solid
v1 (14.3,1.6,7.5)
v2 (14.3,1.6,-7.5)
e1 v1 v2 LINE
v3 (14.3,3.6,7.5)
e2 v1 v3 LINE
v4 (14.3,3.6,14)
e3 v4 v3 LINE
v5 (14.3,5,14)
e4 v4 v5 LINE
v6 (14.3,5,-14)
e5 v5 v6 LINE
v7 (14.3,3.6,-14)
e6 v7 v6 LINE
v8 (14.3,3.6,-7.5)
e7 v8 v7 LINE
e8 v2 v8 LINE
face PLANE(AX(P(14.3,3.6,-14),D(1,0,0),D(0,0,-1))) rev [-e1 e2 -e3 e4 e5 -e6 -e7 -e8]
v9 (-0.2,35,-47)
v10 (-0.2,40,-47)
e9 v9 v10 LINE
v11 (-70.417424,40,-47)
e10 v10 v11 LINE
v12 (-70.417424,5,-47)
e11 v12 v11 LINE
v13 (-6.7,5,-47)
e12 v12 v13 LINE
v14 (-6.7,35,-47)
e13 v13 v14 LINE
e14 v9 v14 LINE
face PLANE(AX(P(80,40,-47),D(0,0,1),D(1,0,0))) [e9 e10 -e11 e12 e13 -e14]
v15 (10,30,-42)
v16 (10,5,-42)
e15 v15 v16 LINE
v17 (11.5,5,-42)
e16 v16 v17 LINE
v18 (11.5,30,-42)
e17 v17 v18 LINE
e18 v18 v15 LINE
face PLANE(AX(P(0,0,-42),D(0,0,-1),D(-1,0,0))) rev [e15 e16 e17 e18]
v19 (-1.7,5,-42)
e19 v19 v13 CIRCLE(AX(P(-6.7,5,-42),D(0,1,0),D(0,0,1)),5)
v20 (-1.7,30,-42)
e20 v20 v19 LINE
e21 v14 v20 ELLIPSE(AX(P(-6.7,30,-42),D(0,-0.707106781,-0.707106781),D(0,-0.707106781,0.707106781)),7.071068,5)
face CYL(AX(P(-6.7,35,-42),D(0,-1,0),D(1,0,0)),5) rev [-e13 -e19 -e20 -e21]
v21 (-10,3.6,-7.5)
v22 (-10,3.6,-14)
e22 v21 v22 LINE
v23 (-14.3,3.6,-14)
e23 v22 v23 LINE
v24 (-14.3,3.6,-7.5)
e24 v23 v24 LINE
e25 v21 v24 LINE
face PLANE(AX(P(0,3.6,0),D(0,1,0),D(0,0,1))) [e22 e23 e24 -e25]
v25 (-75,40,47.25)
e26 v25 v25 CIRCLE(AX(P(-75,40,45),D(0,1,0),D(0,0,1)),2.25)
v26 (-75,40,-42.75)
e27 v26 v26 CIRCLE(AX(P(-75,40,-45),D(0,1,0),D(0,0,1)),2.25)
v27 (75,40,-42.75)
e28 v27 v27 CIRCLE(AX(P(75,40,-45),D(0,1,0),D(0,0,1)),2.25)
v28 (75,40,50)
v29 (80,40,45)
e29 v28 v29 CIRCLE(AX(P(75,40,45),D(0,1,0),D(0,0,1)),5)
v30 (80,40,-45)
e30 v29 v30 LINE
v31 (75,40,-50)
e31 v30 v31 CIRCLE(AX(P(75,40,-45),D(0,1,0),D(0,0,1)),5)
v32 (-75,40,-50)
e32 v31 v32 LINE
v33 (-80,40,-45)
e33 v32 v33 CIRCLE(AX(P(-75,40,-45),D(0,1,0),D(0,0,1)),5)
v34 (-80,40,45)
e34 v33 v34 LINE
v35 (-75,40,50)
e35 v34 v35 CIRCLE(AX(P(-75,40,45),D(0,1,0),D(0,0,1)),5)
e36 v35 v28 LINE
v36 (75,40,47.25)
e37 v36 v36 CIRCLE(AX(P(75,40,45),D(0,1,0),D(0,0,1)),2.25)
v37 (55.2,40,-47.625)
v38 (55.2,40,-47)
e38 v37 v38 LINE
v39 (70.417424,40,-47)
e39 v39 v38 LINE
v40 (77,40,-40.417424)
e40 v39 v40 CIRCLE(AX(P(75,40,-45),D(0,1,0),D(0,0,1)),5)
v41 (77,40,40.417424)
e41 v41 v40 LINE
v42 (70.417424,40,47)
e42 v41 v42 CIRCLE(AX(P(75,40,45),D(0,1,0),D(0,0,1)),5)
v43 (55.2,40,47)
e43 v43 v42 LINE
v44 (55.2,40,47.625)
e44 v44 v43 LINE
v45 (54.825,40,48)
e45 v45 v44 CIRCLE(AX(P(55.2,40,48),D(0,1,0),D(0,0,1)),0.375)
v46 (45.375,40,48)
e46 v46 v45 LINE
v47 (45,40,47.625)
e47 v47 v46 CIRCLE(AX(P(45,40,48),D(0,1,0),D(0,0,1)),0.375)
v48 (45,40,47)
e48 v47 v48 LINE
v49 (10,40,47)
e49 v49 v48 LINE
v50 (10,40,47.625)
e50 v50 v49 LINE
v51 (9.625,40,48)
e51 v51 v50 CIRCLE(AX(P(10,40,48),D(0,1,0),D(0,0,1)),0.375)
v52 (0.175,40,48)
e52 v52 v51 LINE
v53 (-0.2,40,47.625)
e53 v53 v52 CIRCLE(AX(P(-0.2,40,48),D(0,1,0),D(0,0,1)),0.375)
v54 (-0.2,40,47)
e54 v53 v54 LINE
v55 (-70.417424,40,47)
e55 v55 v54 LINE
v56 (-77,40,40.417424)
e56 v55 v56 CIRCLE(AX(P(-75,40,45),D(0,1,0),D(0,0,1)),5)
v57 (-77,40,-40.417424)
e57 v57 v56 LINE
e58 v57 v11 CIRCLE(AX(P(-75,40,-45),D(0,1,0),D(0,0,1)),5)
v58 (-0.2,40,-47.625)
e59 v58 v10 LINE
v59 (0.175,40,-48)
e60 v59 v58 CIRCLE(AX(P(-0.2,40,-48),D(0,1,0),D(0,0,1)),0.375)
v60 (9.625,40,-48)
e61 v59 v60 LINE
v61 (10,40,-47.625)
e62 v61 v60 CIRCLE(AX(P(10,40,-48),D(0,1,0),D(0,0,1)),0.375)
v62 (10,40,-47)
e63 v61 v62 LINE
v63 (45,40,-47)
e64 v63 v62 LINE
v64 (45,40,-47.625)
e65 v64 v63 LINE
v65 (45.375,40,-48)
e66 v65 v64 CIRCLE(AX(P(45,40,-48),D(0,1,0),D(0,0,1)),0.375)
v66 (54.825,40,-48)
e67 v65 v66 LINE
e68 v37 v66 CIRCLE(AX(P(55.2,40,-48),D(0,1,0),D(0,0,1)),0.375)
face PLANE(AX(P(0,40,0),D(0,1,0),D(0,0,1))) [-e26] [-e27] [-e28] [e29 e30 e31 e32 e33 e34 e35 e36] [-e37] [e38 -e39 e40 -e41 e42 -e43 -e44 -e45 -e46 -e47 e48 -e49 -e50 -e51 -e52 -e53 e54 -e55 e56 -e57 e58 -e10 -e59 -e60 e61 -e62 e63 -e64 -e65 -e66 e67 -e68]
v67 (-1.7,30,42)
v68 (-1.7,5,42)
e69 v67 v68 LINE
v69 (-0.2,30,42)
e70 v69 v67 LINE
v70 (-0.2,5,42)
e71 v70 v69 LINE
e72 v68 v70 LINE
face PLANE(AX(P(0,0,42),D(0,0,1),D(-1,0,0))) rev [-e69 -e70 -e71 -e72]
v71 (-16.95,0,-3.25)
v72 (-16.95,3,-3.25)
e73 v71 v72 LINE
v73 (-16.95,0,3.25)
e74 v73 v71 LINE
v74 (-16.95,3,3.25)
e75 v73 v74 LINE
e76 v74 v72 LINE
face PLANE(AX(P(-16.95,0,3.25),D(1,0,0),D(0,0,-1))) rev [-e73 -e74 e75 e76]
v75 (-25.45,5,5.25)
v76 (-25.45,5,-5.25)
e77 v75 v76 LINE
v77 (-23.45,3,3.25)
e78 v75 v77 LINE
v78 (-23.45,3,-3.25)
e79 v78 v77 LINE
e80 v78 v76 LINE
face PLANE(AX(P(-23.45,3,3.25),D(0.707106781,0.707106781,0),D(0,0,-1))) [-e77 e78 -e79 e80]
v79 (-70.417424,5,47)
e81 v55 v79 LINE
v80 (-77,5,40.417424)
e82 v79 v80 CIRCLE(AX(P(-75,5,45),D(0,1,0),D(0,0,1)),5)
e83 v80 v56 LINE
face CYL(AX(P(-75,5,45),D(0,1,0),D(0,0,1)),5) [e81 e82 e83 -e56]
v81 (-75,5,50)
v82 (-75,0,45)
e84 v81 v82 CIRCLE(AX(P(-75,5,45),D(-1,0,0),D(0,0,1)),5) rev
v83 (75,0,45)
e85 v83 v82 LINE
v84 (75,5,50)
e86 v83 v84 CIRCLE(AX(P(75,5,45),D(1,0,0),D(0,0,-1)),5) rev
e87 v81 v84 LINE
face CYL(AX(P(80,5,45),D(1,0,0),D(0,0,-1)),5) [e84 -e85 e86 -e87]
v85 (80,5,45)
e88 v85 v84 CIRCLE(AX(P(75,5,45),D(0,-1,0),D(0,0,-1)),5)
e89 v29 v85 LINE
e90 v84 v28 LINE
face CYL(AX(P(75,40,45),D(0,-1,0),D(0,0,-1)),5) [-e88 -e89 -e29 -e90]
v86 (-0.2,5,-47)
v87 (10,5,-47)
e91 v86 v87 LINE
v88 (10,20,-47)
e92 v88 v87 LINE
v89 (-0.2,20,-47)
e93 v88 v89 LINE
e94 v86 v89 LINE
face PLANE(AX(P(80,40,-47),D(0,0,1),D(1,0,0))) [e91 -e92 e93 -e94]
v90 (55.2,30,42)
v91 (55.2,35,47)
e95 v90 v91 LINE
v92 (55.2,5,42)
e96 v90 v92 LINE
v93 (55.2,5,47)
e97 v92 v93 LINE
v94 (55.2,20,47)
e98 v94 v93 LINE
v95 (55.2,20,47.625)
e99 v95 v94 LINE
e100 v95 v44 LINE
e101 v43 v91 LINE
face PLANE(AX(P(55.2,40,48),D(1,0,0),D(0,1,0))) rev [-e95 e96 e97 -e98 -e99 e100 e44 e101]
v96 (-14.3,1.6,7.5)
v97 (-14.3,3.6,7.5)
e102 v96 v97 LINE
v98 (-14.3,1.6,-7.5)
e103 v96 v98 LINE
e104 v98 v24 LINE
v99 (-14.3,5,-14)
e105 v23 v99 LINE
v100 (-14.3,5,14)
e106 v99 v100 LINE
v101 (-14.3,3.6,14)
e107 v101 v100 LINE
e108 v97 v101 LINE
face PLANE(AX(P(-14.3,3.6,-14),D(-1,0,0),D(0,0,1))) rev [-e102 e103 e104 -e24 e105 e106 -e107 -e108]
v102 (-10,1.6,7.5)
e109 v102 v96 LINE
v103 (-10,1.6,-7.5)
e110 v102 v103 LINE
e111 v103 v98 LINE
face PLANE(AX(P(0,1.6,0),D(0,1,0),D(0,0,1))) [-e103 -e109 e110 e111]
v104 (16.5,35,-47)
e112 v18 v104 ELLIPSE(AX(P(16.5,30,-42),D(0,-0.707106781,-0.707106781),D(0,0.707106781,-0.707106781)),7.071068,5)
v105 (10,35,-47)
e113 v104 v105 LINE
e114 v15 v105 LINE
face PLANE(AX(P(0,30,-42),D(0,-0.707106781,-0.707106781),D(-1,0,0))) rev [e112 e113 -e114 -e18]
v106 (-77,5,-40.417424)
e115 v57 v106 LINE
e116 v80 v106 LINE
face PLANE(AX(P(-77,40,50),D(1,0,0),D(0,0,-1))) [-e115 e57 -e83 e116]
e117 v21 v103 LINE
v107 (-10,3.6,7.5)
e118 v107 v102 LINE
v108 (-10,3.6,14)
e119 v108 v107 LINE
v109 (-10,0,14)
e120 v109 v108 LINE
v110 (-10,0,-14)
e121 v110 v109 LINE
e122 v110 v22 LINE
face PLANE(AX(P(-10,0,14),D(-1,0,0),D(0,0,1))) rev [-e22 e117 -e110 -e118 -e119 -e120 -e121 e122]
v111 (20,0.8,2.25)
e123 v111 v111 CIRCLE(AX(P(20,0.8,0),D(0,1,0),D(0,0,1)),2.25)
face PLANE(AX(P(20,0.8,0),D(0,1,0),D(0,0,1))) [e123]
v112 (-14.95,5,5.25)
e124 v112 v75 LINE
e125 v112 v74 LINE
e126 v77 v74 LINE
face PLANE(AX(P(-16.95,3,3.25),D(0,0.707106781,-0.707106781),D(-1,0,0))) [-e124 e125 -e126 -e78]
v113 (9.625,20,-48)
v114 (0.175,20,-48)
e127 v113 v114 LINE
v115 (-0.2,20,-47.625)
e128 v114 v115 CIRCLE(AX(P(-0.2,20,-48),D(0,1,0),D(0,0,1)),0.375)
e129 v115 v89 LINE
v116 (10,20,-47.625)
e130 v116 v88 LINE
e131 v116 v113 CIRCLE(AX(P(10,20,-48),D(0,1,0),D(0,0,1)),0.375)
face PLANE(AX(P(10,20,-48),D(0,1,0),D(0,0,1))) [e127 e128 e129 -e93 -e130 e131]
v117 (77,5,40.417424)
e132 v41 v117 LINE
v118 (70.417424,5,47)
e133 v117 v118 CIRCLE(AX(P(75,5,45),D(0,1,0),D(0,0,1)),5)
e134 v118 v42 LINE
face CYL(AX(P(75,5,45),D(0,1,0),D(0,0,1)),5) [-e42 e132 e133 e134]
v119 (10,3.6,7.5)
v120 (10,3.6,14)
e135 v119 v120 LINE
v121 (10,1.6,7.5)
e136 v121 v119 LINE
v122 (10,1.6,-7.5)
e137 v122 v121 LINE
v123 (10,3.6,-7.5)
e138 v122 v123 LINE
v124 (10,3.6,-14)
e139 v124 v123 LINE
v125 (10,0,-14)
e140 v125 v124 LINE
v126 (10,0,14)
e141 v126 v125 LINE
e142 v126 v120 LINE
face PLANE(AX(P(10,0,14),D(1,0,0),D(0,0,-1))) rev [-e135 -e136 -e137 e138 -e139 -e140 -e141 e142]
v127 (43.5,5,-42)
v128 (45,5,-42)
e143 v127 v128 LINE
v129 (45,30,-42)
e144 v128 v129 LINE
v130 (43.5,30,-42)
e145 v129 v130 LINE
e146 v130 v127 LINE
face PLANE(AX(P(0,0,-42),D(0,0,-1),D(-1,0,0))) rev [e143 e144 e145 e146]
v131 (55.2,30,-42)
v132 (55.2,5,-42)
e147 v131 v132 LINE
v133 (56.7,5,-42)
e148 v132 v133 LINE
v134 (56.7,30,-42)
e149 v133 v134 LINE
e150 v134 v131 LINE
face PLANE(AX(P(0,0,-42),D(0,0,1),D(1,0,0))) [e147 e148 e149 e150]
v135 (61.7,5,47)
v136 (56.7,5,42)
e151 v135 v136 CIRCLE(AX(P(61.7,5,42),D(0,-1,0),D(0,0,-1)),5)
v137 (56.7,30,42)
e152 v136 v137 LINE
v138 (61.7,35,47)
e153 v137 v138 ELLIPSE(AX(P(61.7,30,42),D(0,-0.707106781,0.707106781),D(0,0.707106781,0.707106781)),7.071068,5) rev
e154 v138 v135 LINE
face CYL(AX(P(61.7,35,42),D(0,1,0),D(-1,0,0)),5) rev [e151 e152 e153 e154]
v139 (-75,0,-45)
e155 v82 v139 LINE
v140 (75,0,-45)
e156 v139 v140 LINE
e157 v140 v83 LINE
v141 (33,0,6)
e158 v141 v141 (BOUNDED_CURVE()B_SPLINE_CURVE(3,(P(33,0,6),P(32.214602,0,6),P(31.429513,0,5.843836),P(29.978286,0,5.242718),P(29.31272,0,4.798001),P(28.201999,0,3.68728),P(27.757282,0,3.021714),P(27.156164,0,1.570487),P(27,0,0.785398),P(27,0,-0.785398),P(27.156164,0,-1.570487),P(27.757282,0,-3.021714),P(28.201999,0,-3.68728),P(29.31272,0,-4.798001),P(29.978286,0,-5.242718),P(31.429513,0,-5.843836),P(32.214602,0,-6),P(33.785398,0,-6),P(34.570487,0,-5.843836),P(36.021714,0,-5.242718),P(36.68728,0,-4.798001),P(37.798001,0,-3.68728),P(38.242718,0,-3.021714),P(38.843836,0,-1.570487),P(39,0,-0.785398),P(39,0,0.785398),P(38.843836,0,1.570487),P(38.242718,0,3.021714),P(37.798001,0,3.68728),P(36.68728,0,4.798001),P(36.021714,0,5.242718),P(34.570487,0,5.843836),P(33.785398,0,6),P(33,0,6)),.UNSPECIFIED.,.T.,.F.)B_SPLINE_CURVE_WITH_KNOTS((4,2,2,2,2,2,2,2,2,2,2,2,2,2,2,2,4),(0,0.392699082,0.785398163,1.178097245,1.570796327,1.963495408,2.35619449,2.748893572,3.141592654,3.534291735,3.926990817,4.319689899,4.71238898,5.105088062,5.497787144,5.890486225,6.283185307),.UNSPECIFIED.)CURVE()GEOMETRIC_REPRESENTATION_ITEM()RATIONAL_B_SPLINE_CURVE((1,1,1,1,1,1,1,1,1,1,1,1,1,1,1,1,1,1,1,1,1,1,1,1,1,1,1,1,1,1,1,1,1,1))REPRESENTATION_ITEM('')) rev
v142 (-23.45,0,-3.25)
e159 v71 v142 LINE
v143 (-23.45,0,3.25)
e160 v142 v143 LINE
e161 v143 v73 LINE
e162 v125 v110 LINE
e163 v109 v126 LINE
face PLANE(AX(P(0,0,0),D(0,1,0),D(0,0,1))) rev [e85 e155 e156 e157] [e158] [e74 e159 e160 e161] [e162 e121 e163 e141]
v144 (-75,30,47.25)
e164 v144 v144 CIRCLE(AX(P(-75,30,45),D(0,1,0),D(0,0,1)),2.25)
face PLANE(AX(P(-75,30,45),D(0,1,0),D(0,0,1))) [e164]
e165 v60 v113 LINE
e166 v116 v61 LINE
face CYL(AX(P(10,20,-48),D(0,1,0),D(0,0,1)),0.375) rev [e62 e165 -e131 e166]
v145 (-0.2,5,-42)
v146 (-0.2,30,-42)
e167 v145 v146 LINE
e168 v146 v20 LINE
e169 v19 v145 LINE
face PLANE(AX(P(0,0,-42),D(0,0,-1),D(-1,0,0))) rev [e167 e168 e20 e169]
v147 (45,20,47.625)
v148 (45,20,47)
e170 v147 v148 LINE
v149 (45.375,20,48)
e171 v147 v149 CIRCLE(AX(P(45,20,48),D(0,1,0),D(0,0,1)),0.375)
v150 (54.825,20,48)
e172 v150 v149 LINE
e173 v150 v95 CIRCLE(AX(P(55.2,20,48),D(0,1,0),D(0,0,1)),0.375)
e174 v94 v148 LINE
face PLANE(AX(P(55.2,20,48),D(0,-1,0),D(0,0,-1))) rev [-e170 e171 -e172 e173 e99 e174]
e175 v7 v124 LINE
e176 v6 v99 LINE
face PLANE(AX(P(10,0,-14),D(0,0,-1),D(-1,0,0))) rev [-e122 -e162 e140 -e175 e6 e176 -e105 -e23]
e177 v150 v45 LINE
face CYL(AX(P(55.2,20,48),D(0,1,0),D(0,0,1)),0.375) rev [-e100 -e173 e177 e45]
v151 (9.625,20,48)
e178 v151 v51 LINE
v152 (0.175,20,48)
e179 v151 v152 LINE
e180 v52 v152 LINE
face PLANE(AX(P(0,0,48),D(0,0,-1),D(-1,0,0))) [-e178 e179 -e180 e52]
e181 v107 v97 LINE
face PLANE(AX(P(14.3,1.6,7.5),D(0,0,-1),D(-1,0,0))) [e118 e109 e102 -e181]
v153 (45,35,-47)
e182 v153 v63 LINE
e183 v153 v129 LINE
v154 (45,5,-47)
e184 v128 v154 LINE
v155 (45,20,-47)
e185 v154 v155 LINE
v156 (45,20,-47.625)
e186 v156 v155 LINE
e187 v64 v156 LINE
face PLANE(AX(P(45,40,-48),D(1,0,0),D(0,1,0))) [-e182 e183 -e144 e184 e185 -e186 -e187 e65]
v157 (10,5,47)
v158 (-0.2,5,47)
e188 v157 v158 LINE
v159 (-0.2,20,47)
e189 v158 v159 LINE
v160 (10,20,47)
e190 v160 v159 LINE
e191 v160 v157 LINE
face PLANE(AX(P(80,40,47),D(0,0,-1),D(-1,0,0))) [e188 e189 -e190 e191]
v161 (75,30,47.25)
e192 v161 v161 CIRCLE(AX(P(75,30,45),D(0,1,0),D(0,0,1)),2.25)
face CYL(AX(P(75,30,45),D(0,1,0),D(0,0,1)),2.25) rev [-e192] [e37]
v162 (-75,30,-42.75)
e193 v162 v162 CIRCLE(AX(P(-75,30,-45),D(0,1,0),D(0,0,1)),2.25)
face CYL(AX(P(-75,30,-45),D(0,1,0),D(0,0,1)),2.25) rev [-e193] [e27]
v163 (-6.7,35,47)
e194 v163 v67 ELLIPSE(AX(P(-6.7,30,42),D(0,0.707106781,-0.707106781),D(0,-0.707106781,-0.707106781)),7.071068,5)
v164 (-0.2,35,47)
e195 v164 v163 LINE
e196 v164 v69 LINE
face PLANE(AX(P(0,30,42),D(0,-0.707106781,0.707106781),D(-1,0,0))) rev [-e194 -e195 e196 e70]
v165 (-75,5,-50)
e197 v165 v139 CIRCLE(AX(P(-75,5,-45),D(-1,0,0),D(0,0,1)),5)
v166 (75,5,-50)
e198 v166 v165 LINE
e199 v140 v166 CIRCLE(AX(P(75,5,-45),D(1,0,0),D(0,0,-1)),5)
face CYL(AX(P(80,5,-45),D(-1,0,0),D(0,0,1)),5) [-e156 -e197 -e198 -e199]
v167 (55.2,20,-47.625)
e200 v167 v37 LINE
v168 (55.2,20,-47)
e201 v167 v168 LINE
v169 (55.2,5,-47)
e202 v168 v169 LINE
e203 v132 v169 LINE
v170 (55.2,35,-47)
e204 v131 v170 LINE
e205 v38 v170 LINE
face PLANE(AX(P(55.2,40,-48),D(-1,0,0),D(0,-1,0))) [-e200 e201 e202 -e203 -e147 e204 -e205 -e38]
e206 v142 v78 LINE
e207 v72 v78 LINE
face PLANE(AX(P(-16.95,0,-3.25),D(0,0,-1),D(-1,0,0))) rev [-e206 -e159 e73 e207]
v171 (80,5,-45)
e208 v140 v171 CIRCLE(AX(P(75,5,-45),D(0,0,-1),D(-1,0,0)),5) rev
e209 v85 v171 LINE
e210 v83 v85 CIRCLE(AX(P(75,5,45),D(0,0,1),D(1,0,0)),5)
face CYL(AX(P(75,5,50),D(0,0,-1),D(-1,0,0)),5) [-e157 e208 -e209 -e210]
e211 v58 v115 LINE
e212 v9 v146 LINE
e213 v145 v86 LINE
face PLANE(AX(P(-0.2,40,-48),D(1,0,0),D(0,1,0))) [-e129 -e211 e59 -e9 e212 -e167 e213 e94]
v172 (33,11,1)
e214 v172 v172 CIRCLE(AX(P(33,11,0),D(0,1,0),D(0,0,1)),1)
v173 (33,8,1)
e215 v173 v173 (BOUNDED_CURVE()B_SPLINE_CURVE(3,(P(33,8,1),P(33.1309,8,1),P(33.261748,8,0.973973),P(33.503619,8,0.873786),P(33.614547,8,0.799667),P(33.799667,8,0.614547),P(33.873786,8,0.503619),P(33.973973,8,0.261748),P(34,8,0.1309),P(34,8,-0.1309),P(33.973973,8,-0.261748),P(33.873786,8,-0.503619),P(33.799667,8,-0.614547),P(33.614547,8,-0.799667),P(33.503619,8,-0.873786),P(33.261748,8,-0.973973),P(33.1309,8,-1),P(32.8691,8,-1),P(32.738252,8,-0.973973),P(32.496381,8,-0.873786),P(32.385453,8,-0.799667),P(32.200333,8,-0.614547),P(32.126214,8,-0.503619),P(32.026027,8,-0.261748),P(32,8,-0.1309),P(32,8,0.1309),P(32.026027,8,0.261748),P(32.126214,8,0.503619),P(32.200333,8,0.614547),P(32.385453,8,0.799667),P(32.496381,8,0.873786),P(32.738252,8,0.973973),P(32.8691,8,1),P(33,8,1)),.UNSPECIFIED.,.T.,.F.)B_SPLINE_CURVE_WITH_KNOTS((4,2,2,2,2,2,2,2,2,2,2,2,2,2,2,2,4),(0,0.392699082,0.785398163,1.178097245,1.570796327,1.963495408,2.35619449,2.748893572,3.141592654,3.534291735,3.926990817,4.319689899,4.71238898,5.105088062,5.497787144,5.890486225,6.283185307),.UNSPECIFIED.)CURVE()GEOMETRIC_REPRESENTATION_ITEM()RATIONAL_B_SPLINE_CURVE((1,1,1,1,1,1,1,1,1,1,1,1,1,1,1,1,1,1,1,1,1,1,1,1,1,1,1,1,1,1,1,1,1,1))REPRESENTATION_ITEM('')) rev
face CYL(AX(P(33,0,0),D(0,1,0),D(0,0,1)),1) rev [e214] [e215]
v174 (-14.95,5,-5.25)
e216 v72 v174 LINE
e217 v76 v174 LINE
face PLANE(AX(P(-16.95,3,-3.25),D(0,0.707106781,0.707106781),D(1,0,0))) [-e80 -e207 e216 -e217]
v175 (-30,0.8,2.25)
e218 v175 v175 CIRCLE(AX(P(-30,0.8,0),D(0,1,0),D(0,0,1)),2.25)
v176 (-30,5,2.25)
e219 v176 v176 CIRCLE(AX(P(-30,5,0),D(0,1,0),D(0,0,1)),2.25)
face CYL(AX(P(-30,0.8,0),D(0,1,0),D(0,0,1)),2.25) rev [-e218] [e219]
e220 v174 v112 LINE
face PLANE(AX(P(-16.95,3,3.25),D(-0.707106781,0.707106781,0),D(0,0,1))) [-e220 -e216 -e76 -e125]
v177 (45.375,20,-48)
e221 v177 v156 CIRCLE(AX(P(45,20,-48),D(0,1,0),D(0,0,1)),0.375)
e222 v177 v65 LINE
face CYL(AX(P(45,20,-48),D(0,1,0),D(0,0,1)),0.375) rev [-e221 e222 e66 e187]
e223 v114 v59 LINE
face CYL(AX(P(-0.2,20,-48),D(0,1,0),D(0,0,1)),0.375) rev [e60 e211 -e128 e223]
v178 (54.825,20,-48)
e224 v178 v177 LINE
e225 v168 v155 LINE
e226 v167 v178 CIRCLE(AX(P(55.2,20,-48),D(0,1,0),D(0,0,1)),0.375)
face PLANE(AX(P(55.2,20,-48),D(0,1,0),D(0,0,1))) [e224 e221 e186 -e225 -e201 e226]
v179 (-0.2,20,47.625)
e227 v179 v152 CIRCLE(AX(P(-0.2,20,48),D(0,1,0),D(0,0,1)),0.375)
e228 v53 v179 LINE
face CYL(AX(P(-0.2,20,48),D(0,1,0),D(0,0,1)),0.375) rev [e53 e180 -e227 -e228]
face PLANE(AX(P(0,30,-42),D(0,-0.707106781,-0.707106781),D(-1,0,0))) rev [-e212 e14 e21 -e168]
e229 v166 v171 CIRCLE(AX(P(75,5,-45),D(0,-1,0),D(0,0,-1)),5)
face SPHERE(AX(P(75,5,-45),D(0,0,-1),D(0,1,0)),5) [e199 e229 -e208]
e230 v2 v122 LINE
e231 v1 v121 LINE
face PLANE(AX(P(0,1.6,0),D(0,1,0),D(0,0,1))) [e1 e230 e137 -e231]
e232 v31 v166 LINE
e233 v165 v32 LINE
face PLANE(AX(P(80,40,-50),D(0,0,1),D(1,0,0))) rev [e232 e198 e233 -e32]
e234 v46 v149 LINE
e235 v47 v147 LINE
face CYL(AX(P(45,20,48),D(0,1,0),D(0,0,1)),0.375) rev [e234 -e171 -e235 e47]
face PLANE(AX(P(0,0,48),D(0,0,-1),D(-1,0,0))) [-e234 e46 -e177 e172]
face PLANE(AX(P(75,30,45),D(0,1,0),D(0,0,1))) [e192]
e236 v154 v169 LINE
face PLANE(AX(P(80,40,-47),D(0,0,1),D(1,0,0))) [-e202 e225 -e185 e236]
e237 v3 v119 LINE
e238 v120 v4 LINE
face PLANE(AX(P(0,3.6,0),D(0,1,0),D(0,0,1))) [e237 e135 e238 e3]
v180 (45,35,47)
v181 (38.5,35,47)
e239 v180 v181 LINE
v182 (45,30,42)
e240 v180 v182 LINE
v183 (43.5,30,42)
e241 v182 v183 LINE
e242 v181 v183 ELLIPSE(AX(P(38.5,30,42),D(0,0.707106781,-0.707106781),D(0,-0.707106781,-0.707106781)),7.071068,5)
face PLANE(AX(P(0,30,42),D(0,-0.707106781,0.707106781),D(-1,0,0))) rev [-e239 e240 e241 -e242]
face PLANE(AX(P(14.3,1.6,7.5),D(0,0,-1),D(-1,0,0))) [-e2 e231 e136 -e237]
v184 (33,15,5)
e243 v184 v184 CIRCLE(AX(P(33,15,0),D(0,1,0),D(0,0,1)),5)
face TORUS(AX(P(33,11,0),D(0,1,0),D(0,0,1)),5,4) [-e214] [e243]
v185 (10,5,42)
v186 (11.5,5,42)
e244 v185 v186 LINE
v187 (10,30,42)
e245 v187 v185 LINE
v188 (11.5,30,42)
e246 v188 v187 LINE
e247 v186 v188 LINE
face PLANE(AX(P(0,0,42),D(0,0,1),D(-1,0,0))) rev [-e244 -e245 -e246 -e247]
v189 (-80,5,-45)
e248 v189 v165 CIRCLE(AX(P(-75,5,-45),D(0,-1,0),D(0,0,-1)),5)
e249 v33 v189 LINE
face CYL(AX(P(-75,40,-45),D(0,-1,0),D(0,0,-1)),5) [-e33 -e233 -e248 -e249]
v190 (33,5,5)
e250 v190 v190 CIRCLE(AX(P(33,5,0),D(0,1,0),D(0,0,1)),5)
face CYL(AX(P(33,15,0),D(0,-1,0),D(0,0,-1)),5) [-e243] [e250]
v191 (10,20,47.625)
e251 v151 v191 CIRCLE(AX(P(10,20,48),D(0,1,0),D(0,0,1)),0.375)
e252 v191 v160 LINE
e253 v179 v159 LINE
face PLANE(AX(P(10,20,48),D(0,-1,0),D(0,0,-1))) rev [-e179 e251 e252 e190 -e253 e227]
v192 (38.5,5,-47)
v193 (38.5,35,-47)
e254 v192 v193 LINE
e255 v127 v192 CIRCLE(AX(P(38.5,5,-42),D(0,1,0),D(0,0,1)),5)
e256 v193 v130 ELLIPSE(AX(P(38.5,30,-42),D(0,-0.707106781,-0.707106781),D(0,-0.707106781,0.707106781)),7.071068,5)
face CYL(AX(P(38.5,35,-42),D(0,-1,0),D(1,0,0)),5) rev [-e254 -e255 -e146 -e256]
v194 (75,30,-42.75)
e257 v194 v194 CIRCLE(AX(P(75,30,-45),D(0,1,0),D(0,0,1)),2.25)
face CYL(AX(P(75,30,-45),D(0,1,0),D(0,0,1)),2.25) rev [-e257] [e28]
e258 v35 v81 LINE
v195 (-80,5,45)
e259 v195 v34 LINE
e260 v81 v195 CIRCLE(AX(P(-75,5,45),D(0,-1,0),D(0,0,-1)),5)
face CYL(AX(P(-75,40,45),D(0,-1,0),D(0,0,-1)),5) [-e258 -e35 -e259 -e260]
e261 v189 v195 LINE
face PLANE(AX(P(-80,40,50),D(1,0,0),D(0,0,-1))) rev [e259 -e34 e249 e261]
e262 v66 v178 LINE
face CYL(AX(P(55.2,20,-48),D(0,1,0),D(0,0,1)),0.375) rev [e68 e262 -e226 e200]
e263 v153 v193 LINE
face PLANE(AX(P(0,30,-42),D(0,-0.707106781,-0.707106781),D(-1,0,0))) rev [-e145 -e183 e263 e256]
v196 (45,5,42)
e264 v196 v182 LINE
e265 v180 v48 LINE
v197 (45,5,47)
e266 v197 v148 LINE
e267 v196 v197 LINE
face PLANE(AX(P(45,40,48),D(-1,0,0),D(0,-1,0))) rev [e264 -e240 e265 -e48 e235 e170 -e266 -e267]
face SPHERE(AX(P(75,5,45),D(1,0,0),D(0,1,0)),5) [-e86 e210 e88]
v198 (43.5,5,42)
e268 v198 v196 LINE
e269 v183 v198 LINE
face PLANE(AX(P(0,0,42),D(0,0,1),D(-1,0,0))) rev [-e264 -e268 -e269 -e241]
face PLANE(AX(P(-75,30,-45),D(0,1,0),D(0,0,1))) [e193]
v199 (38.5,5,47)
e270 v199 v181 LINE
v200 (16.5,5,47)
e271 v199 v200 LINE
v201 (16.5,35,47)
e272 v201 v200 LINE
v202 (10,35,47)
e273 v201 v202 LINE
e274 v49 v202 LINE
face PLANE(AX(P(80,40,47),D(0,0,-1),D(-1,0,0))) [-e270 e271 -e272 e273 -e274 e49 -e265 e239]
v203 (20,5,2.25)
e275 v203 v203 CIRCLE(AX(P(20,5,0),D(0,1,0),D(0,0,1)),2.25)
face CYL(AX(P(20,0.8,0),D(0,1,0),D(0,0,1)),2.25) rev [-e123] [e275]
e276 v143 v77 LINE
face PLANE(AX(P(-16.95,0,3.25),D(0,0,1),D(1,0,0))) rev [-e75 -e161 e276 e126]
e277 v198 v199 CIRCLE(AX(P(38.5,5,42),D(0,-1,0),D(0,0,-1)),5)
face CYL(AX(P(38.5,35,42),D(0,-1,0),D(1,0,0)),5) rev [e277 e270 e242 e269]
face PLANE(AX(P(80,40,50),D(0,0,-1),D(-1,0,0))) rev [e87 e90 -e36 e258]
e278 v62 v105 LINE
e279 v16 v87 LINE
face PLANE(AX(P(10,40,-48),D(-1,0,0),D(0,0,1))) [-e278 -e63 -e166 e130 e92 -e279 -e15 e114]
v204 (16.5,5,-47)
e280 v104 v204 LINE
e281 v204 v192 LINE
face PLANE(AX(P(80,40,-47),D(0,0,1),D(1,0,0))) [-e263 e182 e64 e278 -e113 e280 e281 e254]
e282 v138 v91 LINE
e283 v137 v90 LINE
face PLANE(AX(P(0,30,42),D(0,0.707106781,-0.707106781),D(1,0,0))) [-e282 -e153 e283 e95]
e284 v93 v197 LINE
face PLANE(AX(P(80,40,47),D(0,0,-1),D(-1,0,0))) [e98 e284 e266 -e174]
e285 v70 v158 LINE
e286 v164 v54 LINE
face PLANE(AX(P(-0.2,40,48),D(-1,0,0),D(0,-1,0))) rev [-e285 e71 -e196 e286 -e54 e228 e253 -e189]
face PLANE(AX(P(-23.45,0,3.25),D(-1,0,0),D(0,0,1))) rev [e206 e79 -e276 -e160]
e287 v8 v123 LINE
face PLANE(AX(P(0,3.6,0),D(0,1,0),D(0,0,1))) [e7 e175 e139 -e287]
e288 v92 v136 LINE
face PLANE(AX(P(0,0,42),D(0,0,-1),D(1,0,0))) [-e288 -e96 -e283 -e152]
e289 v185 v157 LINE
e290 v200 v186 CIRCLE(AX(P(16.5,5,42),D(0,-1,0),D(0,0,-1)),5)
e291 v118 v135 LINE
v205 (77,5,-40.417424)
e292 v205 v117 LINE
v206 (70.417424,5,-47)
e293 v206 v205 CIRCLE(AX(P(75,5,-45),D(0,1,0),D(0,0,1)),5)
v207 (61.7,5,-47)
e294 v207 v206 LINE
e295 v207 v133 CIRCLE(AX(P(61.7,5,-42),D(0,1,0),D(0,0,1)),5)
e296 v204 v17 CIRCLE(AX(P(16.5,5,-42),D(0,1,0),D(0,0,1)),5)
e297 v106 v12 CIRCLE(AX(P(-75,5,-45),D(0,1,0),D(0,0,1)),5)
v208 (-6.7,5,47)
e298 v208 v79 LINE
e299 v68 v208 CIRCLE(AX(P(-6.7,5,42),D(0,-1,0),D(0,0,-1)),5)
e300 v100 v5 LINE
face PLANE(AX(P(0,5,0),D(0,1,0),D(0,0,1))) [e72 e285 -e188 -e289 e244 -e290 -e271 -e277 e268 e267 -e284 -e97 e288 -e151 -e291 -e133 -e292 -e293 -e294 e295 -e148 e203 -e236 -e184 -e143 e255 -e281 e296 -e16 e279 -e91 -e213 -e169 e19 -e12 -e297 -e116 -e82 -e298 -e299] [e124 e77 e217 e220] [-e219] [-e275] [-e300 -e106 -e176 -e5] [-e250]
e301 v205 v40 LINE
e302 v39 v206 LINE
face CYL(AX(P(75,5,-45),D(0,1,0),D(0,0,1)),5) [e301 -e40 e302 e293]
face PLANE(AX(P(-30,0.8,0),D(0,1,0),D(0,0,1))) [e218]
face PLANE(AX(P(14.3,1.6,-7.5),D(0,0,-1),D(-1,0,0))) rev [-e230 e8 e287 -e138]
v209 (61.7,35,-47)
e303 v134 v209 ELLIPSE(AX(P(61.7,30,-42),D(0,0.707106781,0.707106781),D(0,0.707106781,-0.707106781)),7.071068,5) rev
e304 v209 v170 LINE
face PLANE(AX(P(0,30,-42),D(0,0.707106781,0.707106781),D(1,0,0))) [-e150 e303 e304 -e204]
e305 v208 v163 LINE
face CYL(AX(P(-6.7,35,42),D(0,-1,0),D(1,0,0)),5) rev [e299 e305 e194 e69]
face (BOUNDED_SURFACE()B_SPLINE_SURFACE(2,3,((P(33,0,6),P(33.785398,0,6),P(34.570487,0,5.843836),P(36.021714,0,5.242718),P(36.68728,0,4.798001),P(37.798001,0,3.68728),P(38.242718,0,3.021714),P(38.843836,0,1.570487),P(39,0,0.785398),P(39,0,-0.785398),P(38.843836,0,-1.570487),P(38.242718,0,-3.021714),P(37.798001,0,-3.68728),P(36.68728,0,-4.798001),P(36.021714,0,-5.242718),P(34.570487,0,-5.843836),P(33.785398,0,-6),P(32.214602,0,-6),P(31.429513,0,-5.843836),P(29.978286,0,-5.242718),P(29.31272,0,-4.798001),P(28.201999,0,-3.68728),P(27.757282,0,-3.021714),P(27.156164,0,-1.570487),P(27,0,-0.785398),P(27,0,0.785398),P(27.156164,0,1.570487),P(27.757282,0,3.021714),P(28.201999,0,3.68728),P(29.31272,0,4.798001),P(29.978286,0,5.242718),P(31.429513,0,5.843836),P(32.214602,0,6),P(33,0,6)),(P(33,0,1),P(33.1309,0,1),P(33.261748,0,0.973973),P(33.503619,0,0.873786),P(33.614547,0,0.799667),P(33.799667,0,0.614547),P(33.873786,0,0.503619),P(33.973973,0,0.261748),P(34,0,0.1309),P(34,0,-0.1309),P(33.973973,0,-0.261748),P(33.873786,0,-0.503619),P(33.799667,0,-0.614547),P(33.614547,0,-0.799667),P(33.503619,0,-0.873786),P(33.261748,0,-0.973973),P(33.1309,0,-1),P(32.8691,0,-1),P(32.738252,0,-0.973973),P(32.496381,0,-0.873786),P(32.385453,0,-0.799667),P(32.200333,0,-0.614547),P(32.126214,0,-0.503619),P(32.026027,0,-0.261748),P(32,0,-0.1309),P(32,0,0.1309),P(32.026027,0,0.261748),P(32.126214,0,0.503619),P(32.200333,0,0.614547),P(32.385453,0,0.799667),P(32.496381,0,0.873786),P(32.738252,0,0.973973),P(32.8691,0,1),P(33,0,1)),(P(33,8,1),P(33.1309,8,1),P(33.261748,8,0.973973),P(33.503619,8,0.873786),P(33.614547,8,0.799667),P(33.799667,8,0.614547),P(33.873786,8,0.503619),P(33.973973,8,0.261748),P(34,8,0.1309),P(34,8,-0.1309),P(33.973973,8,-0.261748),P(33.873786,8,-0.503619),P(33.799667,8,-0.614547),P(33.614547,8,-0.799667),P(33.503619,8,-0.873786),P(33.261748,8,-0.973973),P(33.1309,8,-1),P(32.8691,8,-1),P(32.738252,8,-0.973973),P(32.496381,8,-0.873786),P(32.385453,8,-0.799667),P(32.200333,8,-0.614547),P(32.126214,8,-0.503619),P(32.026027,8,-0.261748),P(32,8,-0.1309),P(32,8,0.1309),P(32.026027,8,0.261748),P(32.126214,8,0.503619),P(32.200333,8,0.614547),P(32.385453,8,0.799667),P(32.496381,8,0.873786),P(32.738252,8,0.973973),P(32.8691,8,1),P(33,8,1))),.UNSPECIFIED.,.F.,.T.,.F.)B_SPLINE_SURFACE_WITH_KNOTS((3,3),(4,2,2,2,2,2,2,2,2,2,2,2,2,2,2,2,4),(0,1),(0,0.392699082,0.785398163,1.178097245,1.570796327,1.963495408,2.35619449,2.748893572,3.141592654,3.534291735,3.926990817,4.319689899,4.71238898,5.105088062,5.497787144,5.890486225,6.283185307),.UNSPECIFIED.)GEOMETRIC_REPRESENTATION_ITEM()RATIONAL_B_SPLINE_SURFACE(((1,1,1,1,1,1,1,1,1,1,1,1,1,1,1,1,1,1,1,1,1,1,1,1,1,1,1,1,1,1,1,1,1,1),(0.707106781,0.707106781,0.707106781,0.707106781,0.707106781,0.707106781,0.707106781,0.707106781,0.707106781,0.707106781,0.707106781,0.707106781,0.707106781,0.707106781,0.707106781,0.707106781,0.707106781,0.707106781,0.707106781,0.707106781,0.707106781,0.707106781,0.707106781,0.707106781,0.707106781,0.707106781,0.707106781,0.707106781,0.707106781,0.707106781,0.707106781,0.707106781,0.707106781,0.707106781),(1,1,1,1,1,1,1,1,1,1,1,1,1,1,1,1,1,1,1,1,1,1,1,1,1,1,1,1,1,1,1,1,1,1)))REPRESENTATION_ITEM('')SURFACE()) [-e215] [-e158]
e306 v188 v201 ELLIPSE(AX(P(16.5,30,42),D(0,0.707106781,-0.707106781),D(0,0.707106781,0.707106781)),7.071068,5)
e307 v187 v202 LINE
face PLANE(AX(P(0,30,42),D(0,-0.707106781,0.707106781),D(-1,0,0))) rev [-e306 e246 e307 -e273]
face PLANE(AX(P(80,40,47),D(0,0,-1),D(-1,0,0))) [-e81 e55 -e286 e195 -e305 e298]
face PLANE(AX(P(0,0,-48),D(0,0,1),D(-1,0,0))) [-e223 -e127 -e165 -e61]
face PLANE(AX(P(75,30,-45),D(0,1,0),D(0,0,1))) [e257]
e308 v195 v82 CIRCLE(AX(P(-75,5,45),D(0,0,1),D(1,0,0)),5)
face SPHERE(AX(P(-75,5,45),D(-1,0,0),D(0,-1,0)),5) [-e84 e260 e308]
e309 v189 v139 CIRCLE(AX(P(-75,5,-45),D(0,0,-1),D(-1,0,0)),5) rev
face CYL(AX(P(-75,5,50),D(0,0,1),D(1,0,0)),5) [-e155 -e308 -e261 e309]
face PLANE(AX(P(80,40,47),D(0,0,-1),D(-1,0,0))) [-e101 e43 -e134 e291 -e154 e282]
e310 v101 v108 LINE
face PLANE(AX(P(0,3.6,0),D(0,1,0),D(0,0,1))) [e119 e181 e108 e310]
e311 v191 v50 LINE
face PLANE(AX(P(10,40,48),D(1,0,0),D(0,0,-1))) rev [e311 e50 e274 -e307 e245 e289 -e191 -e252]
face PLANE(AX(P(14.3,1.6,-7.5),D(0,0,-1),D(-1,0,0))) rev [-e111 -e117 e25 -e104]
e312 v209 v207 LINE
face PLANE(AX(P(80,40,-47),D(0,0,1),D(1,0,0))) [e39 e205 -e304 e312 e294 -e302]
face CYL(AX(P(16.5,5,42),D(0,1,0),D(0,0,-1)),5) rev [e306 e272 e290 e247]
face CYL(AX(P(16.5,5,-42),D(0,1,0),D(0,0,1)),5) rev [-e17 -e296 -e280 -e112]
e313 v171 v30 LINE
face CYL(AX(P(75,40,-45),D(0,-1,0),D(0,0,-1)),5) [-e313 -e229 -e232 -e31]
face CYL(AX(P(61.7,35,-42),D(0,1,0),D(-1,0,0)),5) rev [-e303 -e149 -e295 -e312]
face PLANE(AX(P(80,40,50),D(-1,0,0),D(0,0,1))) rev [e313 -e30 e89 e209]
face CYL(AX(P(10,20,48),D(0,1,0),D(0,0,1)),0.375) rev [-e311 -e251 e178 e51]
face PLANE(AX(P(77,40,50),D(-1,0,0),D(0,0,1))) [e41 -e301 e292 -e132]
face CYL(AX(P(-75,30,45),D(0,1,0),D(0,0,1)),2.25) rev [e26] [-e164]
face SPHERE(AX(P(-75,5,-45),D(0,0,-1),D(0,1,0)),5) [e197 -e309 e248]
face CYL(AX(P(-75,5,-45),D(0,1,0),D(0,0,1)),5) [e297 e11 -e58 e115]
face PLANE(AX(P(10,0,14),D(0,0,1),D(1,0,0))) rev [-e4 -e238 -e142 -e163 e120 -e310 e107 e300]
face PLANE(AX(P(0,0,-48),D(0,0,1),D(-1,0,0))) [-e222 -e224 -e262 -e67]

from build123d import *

# Parameters (mm, degrees)
SKETCH1_W                    = 160
SKETCH1_H                    = 100
MAINBODY_DEPTH               = 40
FILLET1_R                    = 5
SHELL1_START                 = 5
SHELL1_DEPTH                 = 35
ROTARYASSEMBLYCUTOUTSKETCH_W = 10.2
ROTARYASSEMBLYCUTOUTSKETCH_H = 20
ROTARYASSEMBLYCUTOUT_DEPTH   = 1
SKETCH5_R                    = 5
SCREWHOLEMATERIAL_DEPTH      = 35
SKETCH6_R                    = 2.25
INSERTHOLE_DEPTH             = 10
SKETCH8_W                    = 20
SKETCH8_H                    = 28
SCREENCUTOUT_DEPTH           = 101.623058987
SKETCH7_W                    = 28.6
SKETCH7_H                    = 28
SCREENCUTOUT1_DEPTH          = 1.4
SKETCH9_W                    = 28.6
SKETCH9_H                    = 15
SCREENCUTOUT2_DEPTH          = 2
SKETCH10_W                   = 6.5
SKETCH10_H                   = 6.5
BUTTONHOLE_DEPTH             = 101.623058987
SKETCH11_R                   = 2.25
HEATINSERTHOLE_DEPTH         = 4.2
SKETCH12_R                   = 5
STRINGSUPPORT_DEPTH          = 10
SKETCH13_R                   = 1
STRINGHOLE_DEPTH             = 98.59610648
FILLET2_R                    = 4
FILLET3_SIZE                 = 8
FILLET3_SIZE_2               = 5
SKETCH14_W                   = 1.5
SKETCH14_H                   = 30
BOSS_EXTRUDE1_DEPTH          = 5
SKETCH15_R                   = 0.5
CUT_EXTRUDE1_DEPTH           = 20
CHAMFER1_SIZE                = 5
FILLET5_R                    = 5
SKETCH17_W                   = 1.5
SKETCH17_H                   = 30
BOSS_EXTRUDE2_DEPTH          = 5
CHAMFER2_SIZE                = 5
FILLET6_R                    = 5
SKETCH16_R                   = 0.5
CUT_EXTRUDE2_DEPTH           = 20
SKETCH18_R                   = 0.375
CUT_EXTRUDE3_DEPTH           = 20
CHAMFER3_SIZE                = 2


# Read off the part's stored shape, not the designer's step: Shell1
# Some blends are built 0.0001 mm under size
with BuildPart() as part:
    # Sketch1 → MainBody (new body)
    with BuildSketch(Plane(origin=(0, 0, 0), x_dir=(1, 0, 0), z_dir=(0, 1, 0))):
        Rectangle(SKETCH1_W, SKETCH1_H)
    extrude(amount=MAINBODY_DEPTH)

    # Fillet1
    fillet1_edges = [part.edges().sort_by_distance(p)[0] for p in [
        (0, 0, -50),
        (80, 0, 0),
        (0, 0, 50),
        (-80, 0, 0),
        (-80, 20, -50),
        (80, 20, -50),
        (80, 20, 50),
        (-80, 20, 50),
    ]]
    fillet(fillet1_edges, radius=FILLET1_R)

    # Shell1 outline → Shell1 (cut)
    with BuildSketch(Plane(origin=(0, 0, 0), x_dir=(1, 0, 0), z_dir=(0, 1, 0)).offset(SHELL1_START)):
        with BuildLine():
            Line((-77, 45), (-77, -45))
            ThreePointArc((-77, -45), (-76.414213562, -46.414213562), (-75, -47))
            Line((-75, -47), (75, -47))
            ThreePointArc((75, -47), (76.414213562, -46.414213562), (77, -45))
            Line((77, -45), (77, 45))
            ThreePointArc((77, 45), (76.414213562, 46.414213562), (75, 47))
            Line((75, 47), (-75, 47))
            ThreePointArc((-75, 47), (-76.414213562, 46.414213562), (-77, 45))
        make_face()
    extrude(amount=SHELL1_DEPTH, mode=Mode.SUBTRACT)

    # RotaryAssemblyCutoutSketch → RotaryAssemblyCutout (cut)
    with BuildSketch(Plane(origin=(0, 0, 47), x_dir=(-1, 0, 0), z_dir=(0, 0, -1))):
        with Locations((-50.1, 30)):
            Rectangle(ROTARYASSEMBLYCUTOUTSKETCH_W, ROTARYASSEMBLYCUTOUTSKETCH_H)
        with Locations((-4.9, 30)):
            Rectangle(ROTARYASSEMBLYCUTOUTSKETCH_W, ROTARYASSEMBLYCUTOUTSKETCH_H)
    rotaryassemblycutout = extrude(amount=-ROTARYASSEMBLYCUTOUT_DEPTH, mode=Mode.SUBTRACT)

    # CutoutMirror: RotaryAssemblyCutout across plane
    add(rotaryassemblycutout.mirror(Plane(origin=(0, 0, 0), x_dir=(1, 0, 0), z_dir=(0, 0, -1))), mode=Mode.SUBTRACT)

    # Sketch5 → ScrewHoleMaterial (add)
    with BuildSketch(Plane(origin=(0, 40, 0), x_dir=(1, 0, 0), z_dir=(0, 1, 0))):
        with Locations((-75, 45)):
            Circle(SKETCH5_R)
        with Locations((-75, -45)):
            Circle(SKETCH5_R)
        with Locations((75, -45)):
            Circle(SKETCH5_R)
        with Locations((75, 45)):
            Circle(SKETCH5_R)
    extrude(amount=-SCREWHOLEMATERIAL_DEPTH)

    # Sketch6 → InsertHole (cut)
    with BuildSketch(Plane(origin=(0, 40, 0), x_dir=(1, 0, 0), z_dir=(0, 1, 0))):
        with Locations(Location((-75, 45, 0), (0, 0, 270))):
            Circle(SKETCH6_R)
        with Locations(Location((-75, -45, 0), (0, 0, 270))):
            Circle(SKETCH6_R)
        with Locations(Location((75, -45, 0), (0, 0, 270))):
            Circle(SKETCH6_R)
        with Locations(Location((75, 45, 0), (0, 0, 270))):
            Circle(SKETCH6_R)
    extrude(amount=-INSERTHOLE_DEPTH, mode=Mode.SUBTRACT)

    # Sketch8 → ScreenCutout (cut, through all)
    with BuildSketch(Plane(origin=(0, 5, 0), x_dir=(1, 0, 0), z_dir=(0, 1, 0))):
        Rectangle(SKETCH8_W, SKETCH8_H)
    extrude(amount=-SCREENCUTOUT_DEPTH, mode=Mode.SUBTRACT)

    # Sketch7 → ScreenCutout1 (cut)
    with BuildSketch(Plane(origin=(0, 5, 0), x_dir=(1, 0, 0), z_dir=(0, 1, 0))):
        Rectangle(SKETCH7_W, SKETCH7_H)
    extrude(amount=-SCREENCUTOUT1_DEPTH, mode=Mode.SUBTRACT)

    # Sketch9 → ScreenCutout2 (cut)
    with BuildSketch(Plane(origin=(0, 3.6, 0), x_dir=(1, 0, 0), z_dir=(0, 1, 0))):
        Rectangle(SKETCH9_W, SKETCH9_H)
    extrude(amount=-SCREENCUTOUT2_DEPTH, mode=Mode.SUBTRACT)

    # Sketch10 → ButtonHole (cut, through all)
    with BuildSketch(Plane(origin=(0, 5, 0), x_dir=(1, 0, 0), z_dir=(0, 1, 0))):
        with Locations((-20.2, 0)):
            Rectangle(SKETCH10_W, SKETCH10_H)
    extrude(amount=-BUTTONHOLE_DEPTH, mode=Mode.SUBTRACT)

    # Sketch11 → HeatInsertHole (cut)
    with BuildSketch(Plane(origin=(0, 5, 0), x_dir=(1, 0, 0), z_dir=(0, 1, 0))):
        with Locations(Location((-30, 0, 0), (0, 0, 270))):
            Circle(SKETCH11_R)
        with Locations(Location((20, 0, 0), (0, 0, 270))):
            Circle(SKETCH11_R)
    extrude(amount=-HEATINSERTHOLE_DEPTH, mode=Mode.SUBTRACT)

    # Sketch12 → StringSupport (add)
    with BuildSketch(Plane(origin=(0, 5, 0), x_dir=(1, 0, 0), z_dir=(0, 1, 0))):
        with Locations(Location((33, 0, 0), (0, 0, 270))):
            Circle(SKETCH12_R)
    extrude(amount=STRINGSUPPORT_DEPTH)

    # Sketch13 → StringHole (cut, through all)
    with BuildSketch(Plane(origin=(0, 15, 0), x_dir=(1, 0, 0), z_dir=(0, 1, 0))):
        with Locations(Location((33, 0, 0), (0, 0, 270))):
            Circle(SKETCH13_R)
    extrude(amount=-STRINGHOLE_DEPTH, mode=Mode.SUBTRACT)

    # Fillet2
    fillet2_edges = [part.edges().sort_by_distance(p)[0] for p in [
        (33, 15, -1),
    ]]
    fillet(fillet2_edges, radius=FILLET2_R - 0.0001)  # a hair under: the kernel refuses the full size

    # Fillet3
    # an asymmetric fillet: 8, 5 mm, written as the material it takes off along each edge
    with BuildSketch(Plane(origin=(33, 0, 0), x_dir=(0, 0, 1), z_dir=(-1, 0, 0))) as fillet3_piece_1:
        with BuildLine():
            Bezier((1, FILLET3_SIZE), (1, 0), (1 + FILLET3_SIZE_2, 0), weights=[1, 0.707106781, 1])
            Line((1 + FILLET3_SIZE_2, 0), (1, 0))
            Line((1, 0), (1, FILLET3_SIZE))
        make_face()
    revolve(axis=Axis((33, 0, 0), (0, 1, 0)), mode=Mode.SUBTRACT)

    # Sketch14 → Boss-Extrude1 (add)
    with BuildSketch(Plane.XY.offset(-47)):
        with Locations((-0.95, 20)):
            Rectangle(SKETCH14_W, SKETCH14_H)
        with Locations((10.75, 20)):
            Rectangle(SKETCH14_W, SKETCH14_H)
    extrude(amount=BOSS_EXTRUDE1_DEPTH)

    # Sketch15 → Cut-Extrude1 (cut)
    with BuildSketch(Plane(origin=(0, 40, 0), x_dir=(1, 0, 0), z_dir=(0, 1, 0))):
        with Locations((-0.2, 48)):
            Circle(SKETCH15_R)
        with Locations((10, 48)):
            Circle(SKETCH15_R)
    extrude(amount=-CUT_EXTRUDE1_DEPTH, mode=Mode.SUBTRACT)

    # Chamfer1
    chamfer1_edges = [part.edges().sort_by_distance(p)[0] for p in [
        (10.75, 35, -42),
        (-0.95, 35, -42),
    ]]
    chamfer(chamfer1_edges, length=CHAMFER1_SIZE - 0.0001)  # a hair under: the kernel refuses the full size

    # Fillet5
    # the kernel refuses this fillet: 5 mm, written as the material it adds along each edge
    with BuildSketch(Plane(origin=(11.5, 5, -47), x_dir=(0, 0, 1), z_dir=(0, 1, 0))) as fillet5_piece_1_section:
        with BuildLine():
            CenterArc((FILLET5_R, FILLET5_R), FILLET5_R, 180, 90)
            Line((0, FILLET5_R), (0, 0))
            Line((0, 0), (FILLET5_R, 0))
        make_face()
    fillet5_piece_1 = extrude(amount=42.5, mode=Mode.PRIVATE)
    fillet5_piece_1 = split(fillet5_piece_1, bisect_by=Plane(origin=(12.655573562, 26.680118084, -38.680018084), z_dir=(0, -0.7071067811865479, -0.7071067811865474)), keep=Keep.TOP, mode=Mode.PRIVATE)
    add(fillet5_piece_1)
    with BuildSketch(Plane(origin=(-1.7, 47.5, -47), x_dir=(-1, 0, 0), z_dir=(0, -1, 0))) as fillet5_piece_2_section:
        with BuildLine():
            CenterArc((FILLET5_R, -FILLET5_R), FILLET5_R, 90, 90)
            Line((0, -FILLET5_R), (0, 0))
            Line((0, 0), (FILLET5_R, 0))
        make_face()
    fillet5_piece_2 = extrude(amount=42.5, mode=Mode.PRIVATE)
    fillet5_piece_2 = split(fillet5_piece_2, bisect_by=Plane(origin=(-4.149999992, 35.05005, -47.04995), z_dir=(0, -0.7071067811865479, -0.7071067811865474)), keep=Keep.TOP, mode=Mode.PRIVATE)
    add(fillet5_piece_2)

    # Sketch17 → Boss-Extrude2 (add)
    with BuildSketch(Plane.XY.offset(-47)):
        with Locations((44.25, 20)):
            Rectangle(SKETCH17_W, SKETCH17_H)
        with Locations((55.95, 20)):
            Rectangle(SKETCH17_W, SKETCH17_H)
    extrude(amount=BOSS_EXTRUDE2_DEPTH)

    # Chamfer2
    chamfer2_edges = [part.edges().sort_by_distance(p)[0] for p in [
        (55.95, 35, -42),
        (44.25, 35, -42),
    ]]
    chamfer(chamfer2_edges, length=CHAMFER2_SIZE - 0.0001)  # a hair under: the kernel refuses the full size

    # Fillet6
    # the kernel refuses this fillet: 5 mm, written as the material it adds along each edge
    with BuildSketch(Plane(origin=(56.7, 47.5, -47), x_dir=(0, 0, 1), z_dir=(0, -1, 0))) as fillet6_piece_1_section:
        with BuildLine():
            CenterArc((FILLET6_R, -FILLET6_R), FILLET6_R, 90, 90)
            Line((0, -FILLET6_R), (0, 0))
            Line((0, 0), (FILLET6_R, 0))
        make_face()
    fillet6_piece_1 = extrude(amount=42.5, mode=Mode.PRIVATE)
    fillet6_piece_1 = split(fillet6_piece_1, bisect_by=Plane(origin=(59.149999992, 35.05005, -47.04995), z_dir=(0, -0.7071067811865479, -0.7071067811865474)), keep=Keep.TOP, mode=Mode.PRIVATE)
    add(fillet6_piece_1)
    with BuildSketch(Plane(origin=(43.5, 47.5, -47), x_dir=(0, 0, 1), z_dir=(0, -1, 0))) as fillet6_piece_2_section:
        with BuildLine():
            CenterArc((FILLET6_R, FILLET6_R), FILLET6_R, 180, 90)
            Line((0, FILLET6_R), (0, 0))
            Line((0, 0), (FILLET6_R, 0))
        make_face()
    fillet6_piece_2 = extrude(amount=42.5, mode=Mode.PRIVATE)
    fillet6_piece_2 = split(fillet6_piece_2, bisect_by=Plane(origin=(41.050000008, 35.05005, -47.04995), z_dir=(0, -0.7071067811865479, -0.7071067811865474)), keep=Keep.TOP, mode=Mode.PRIVATE)
    add(fillet6_piece_2)

    # Sketch16 → Cut-Extrude2 (cut)
    with BuildSketch(Plane(origin=(0, 40, 0), x_dir=(1, 0, 0), z_dir=(0, 1, 0))):
        with Locations((45, 48)):
            Circle(SKETCH16_R)
        with Locations((55.2, 48)):
            Circle(SKETCH16_R)
    extrude(amount=-CUT_EXTRUDE2_DEPTH, mode=Mode.SUBTRACT)

    # Mirror5: part across plane


with BuildPart() as part_1:
    add(part.part)
    add(part.part.mirror(Plane.XY))

    # Sketch18 → Cut-Extrude3 (cut)
    with BuildSketch(Plane(origin=(0, 40, 0), x_dir=(1, 0, 0), z_dir=(0, 1, 0))):
        with Locations((-0.2, 48)):
            Circle(SKETCH18_R)
        with Locations((10, 48)):
            Circle(SKETCH18_R)
        with Locations((45, 48)):
            Circle(SKETCH18_R)
        with Locations((55.2, 48)):
            Circle(SKETCH18_R)
        with Locations((-0.2, -48)):
            Circle(SKETCH18_R)
        with Locations((10, -48)):
            Circle(SKETCH18_R)
        with Locations((45, -48)):
            Circle(SKETCH18_R)
        with Locations((55.2, -48)):
            Circle(SKETCH18_R)
    extrude(amount=-CUT_EXTRUDE3_DEPTH, mode=Mode.SUBTRACT)

    # Chamfer3
    chamfer3_edges = [part_1.edges().sort_by_distance(p)[0] for p in [
        (-23.45, 5, 0),
        (-20.2, 5, 3.25),
        (-16.95, 5, 0),
        (-20.2, 5, -3.25),
    ]]
    chamfer(chamfer3_edges, length=CHAMFER3_SIZE)


solid = part_1.part
